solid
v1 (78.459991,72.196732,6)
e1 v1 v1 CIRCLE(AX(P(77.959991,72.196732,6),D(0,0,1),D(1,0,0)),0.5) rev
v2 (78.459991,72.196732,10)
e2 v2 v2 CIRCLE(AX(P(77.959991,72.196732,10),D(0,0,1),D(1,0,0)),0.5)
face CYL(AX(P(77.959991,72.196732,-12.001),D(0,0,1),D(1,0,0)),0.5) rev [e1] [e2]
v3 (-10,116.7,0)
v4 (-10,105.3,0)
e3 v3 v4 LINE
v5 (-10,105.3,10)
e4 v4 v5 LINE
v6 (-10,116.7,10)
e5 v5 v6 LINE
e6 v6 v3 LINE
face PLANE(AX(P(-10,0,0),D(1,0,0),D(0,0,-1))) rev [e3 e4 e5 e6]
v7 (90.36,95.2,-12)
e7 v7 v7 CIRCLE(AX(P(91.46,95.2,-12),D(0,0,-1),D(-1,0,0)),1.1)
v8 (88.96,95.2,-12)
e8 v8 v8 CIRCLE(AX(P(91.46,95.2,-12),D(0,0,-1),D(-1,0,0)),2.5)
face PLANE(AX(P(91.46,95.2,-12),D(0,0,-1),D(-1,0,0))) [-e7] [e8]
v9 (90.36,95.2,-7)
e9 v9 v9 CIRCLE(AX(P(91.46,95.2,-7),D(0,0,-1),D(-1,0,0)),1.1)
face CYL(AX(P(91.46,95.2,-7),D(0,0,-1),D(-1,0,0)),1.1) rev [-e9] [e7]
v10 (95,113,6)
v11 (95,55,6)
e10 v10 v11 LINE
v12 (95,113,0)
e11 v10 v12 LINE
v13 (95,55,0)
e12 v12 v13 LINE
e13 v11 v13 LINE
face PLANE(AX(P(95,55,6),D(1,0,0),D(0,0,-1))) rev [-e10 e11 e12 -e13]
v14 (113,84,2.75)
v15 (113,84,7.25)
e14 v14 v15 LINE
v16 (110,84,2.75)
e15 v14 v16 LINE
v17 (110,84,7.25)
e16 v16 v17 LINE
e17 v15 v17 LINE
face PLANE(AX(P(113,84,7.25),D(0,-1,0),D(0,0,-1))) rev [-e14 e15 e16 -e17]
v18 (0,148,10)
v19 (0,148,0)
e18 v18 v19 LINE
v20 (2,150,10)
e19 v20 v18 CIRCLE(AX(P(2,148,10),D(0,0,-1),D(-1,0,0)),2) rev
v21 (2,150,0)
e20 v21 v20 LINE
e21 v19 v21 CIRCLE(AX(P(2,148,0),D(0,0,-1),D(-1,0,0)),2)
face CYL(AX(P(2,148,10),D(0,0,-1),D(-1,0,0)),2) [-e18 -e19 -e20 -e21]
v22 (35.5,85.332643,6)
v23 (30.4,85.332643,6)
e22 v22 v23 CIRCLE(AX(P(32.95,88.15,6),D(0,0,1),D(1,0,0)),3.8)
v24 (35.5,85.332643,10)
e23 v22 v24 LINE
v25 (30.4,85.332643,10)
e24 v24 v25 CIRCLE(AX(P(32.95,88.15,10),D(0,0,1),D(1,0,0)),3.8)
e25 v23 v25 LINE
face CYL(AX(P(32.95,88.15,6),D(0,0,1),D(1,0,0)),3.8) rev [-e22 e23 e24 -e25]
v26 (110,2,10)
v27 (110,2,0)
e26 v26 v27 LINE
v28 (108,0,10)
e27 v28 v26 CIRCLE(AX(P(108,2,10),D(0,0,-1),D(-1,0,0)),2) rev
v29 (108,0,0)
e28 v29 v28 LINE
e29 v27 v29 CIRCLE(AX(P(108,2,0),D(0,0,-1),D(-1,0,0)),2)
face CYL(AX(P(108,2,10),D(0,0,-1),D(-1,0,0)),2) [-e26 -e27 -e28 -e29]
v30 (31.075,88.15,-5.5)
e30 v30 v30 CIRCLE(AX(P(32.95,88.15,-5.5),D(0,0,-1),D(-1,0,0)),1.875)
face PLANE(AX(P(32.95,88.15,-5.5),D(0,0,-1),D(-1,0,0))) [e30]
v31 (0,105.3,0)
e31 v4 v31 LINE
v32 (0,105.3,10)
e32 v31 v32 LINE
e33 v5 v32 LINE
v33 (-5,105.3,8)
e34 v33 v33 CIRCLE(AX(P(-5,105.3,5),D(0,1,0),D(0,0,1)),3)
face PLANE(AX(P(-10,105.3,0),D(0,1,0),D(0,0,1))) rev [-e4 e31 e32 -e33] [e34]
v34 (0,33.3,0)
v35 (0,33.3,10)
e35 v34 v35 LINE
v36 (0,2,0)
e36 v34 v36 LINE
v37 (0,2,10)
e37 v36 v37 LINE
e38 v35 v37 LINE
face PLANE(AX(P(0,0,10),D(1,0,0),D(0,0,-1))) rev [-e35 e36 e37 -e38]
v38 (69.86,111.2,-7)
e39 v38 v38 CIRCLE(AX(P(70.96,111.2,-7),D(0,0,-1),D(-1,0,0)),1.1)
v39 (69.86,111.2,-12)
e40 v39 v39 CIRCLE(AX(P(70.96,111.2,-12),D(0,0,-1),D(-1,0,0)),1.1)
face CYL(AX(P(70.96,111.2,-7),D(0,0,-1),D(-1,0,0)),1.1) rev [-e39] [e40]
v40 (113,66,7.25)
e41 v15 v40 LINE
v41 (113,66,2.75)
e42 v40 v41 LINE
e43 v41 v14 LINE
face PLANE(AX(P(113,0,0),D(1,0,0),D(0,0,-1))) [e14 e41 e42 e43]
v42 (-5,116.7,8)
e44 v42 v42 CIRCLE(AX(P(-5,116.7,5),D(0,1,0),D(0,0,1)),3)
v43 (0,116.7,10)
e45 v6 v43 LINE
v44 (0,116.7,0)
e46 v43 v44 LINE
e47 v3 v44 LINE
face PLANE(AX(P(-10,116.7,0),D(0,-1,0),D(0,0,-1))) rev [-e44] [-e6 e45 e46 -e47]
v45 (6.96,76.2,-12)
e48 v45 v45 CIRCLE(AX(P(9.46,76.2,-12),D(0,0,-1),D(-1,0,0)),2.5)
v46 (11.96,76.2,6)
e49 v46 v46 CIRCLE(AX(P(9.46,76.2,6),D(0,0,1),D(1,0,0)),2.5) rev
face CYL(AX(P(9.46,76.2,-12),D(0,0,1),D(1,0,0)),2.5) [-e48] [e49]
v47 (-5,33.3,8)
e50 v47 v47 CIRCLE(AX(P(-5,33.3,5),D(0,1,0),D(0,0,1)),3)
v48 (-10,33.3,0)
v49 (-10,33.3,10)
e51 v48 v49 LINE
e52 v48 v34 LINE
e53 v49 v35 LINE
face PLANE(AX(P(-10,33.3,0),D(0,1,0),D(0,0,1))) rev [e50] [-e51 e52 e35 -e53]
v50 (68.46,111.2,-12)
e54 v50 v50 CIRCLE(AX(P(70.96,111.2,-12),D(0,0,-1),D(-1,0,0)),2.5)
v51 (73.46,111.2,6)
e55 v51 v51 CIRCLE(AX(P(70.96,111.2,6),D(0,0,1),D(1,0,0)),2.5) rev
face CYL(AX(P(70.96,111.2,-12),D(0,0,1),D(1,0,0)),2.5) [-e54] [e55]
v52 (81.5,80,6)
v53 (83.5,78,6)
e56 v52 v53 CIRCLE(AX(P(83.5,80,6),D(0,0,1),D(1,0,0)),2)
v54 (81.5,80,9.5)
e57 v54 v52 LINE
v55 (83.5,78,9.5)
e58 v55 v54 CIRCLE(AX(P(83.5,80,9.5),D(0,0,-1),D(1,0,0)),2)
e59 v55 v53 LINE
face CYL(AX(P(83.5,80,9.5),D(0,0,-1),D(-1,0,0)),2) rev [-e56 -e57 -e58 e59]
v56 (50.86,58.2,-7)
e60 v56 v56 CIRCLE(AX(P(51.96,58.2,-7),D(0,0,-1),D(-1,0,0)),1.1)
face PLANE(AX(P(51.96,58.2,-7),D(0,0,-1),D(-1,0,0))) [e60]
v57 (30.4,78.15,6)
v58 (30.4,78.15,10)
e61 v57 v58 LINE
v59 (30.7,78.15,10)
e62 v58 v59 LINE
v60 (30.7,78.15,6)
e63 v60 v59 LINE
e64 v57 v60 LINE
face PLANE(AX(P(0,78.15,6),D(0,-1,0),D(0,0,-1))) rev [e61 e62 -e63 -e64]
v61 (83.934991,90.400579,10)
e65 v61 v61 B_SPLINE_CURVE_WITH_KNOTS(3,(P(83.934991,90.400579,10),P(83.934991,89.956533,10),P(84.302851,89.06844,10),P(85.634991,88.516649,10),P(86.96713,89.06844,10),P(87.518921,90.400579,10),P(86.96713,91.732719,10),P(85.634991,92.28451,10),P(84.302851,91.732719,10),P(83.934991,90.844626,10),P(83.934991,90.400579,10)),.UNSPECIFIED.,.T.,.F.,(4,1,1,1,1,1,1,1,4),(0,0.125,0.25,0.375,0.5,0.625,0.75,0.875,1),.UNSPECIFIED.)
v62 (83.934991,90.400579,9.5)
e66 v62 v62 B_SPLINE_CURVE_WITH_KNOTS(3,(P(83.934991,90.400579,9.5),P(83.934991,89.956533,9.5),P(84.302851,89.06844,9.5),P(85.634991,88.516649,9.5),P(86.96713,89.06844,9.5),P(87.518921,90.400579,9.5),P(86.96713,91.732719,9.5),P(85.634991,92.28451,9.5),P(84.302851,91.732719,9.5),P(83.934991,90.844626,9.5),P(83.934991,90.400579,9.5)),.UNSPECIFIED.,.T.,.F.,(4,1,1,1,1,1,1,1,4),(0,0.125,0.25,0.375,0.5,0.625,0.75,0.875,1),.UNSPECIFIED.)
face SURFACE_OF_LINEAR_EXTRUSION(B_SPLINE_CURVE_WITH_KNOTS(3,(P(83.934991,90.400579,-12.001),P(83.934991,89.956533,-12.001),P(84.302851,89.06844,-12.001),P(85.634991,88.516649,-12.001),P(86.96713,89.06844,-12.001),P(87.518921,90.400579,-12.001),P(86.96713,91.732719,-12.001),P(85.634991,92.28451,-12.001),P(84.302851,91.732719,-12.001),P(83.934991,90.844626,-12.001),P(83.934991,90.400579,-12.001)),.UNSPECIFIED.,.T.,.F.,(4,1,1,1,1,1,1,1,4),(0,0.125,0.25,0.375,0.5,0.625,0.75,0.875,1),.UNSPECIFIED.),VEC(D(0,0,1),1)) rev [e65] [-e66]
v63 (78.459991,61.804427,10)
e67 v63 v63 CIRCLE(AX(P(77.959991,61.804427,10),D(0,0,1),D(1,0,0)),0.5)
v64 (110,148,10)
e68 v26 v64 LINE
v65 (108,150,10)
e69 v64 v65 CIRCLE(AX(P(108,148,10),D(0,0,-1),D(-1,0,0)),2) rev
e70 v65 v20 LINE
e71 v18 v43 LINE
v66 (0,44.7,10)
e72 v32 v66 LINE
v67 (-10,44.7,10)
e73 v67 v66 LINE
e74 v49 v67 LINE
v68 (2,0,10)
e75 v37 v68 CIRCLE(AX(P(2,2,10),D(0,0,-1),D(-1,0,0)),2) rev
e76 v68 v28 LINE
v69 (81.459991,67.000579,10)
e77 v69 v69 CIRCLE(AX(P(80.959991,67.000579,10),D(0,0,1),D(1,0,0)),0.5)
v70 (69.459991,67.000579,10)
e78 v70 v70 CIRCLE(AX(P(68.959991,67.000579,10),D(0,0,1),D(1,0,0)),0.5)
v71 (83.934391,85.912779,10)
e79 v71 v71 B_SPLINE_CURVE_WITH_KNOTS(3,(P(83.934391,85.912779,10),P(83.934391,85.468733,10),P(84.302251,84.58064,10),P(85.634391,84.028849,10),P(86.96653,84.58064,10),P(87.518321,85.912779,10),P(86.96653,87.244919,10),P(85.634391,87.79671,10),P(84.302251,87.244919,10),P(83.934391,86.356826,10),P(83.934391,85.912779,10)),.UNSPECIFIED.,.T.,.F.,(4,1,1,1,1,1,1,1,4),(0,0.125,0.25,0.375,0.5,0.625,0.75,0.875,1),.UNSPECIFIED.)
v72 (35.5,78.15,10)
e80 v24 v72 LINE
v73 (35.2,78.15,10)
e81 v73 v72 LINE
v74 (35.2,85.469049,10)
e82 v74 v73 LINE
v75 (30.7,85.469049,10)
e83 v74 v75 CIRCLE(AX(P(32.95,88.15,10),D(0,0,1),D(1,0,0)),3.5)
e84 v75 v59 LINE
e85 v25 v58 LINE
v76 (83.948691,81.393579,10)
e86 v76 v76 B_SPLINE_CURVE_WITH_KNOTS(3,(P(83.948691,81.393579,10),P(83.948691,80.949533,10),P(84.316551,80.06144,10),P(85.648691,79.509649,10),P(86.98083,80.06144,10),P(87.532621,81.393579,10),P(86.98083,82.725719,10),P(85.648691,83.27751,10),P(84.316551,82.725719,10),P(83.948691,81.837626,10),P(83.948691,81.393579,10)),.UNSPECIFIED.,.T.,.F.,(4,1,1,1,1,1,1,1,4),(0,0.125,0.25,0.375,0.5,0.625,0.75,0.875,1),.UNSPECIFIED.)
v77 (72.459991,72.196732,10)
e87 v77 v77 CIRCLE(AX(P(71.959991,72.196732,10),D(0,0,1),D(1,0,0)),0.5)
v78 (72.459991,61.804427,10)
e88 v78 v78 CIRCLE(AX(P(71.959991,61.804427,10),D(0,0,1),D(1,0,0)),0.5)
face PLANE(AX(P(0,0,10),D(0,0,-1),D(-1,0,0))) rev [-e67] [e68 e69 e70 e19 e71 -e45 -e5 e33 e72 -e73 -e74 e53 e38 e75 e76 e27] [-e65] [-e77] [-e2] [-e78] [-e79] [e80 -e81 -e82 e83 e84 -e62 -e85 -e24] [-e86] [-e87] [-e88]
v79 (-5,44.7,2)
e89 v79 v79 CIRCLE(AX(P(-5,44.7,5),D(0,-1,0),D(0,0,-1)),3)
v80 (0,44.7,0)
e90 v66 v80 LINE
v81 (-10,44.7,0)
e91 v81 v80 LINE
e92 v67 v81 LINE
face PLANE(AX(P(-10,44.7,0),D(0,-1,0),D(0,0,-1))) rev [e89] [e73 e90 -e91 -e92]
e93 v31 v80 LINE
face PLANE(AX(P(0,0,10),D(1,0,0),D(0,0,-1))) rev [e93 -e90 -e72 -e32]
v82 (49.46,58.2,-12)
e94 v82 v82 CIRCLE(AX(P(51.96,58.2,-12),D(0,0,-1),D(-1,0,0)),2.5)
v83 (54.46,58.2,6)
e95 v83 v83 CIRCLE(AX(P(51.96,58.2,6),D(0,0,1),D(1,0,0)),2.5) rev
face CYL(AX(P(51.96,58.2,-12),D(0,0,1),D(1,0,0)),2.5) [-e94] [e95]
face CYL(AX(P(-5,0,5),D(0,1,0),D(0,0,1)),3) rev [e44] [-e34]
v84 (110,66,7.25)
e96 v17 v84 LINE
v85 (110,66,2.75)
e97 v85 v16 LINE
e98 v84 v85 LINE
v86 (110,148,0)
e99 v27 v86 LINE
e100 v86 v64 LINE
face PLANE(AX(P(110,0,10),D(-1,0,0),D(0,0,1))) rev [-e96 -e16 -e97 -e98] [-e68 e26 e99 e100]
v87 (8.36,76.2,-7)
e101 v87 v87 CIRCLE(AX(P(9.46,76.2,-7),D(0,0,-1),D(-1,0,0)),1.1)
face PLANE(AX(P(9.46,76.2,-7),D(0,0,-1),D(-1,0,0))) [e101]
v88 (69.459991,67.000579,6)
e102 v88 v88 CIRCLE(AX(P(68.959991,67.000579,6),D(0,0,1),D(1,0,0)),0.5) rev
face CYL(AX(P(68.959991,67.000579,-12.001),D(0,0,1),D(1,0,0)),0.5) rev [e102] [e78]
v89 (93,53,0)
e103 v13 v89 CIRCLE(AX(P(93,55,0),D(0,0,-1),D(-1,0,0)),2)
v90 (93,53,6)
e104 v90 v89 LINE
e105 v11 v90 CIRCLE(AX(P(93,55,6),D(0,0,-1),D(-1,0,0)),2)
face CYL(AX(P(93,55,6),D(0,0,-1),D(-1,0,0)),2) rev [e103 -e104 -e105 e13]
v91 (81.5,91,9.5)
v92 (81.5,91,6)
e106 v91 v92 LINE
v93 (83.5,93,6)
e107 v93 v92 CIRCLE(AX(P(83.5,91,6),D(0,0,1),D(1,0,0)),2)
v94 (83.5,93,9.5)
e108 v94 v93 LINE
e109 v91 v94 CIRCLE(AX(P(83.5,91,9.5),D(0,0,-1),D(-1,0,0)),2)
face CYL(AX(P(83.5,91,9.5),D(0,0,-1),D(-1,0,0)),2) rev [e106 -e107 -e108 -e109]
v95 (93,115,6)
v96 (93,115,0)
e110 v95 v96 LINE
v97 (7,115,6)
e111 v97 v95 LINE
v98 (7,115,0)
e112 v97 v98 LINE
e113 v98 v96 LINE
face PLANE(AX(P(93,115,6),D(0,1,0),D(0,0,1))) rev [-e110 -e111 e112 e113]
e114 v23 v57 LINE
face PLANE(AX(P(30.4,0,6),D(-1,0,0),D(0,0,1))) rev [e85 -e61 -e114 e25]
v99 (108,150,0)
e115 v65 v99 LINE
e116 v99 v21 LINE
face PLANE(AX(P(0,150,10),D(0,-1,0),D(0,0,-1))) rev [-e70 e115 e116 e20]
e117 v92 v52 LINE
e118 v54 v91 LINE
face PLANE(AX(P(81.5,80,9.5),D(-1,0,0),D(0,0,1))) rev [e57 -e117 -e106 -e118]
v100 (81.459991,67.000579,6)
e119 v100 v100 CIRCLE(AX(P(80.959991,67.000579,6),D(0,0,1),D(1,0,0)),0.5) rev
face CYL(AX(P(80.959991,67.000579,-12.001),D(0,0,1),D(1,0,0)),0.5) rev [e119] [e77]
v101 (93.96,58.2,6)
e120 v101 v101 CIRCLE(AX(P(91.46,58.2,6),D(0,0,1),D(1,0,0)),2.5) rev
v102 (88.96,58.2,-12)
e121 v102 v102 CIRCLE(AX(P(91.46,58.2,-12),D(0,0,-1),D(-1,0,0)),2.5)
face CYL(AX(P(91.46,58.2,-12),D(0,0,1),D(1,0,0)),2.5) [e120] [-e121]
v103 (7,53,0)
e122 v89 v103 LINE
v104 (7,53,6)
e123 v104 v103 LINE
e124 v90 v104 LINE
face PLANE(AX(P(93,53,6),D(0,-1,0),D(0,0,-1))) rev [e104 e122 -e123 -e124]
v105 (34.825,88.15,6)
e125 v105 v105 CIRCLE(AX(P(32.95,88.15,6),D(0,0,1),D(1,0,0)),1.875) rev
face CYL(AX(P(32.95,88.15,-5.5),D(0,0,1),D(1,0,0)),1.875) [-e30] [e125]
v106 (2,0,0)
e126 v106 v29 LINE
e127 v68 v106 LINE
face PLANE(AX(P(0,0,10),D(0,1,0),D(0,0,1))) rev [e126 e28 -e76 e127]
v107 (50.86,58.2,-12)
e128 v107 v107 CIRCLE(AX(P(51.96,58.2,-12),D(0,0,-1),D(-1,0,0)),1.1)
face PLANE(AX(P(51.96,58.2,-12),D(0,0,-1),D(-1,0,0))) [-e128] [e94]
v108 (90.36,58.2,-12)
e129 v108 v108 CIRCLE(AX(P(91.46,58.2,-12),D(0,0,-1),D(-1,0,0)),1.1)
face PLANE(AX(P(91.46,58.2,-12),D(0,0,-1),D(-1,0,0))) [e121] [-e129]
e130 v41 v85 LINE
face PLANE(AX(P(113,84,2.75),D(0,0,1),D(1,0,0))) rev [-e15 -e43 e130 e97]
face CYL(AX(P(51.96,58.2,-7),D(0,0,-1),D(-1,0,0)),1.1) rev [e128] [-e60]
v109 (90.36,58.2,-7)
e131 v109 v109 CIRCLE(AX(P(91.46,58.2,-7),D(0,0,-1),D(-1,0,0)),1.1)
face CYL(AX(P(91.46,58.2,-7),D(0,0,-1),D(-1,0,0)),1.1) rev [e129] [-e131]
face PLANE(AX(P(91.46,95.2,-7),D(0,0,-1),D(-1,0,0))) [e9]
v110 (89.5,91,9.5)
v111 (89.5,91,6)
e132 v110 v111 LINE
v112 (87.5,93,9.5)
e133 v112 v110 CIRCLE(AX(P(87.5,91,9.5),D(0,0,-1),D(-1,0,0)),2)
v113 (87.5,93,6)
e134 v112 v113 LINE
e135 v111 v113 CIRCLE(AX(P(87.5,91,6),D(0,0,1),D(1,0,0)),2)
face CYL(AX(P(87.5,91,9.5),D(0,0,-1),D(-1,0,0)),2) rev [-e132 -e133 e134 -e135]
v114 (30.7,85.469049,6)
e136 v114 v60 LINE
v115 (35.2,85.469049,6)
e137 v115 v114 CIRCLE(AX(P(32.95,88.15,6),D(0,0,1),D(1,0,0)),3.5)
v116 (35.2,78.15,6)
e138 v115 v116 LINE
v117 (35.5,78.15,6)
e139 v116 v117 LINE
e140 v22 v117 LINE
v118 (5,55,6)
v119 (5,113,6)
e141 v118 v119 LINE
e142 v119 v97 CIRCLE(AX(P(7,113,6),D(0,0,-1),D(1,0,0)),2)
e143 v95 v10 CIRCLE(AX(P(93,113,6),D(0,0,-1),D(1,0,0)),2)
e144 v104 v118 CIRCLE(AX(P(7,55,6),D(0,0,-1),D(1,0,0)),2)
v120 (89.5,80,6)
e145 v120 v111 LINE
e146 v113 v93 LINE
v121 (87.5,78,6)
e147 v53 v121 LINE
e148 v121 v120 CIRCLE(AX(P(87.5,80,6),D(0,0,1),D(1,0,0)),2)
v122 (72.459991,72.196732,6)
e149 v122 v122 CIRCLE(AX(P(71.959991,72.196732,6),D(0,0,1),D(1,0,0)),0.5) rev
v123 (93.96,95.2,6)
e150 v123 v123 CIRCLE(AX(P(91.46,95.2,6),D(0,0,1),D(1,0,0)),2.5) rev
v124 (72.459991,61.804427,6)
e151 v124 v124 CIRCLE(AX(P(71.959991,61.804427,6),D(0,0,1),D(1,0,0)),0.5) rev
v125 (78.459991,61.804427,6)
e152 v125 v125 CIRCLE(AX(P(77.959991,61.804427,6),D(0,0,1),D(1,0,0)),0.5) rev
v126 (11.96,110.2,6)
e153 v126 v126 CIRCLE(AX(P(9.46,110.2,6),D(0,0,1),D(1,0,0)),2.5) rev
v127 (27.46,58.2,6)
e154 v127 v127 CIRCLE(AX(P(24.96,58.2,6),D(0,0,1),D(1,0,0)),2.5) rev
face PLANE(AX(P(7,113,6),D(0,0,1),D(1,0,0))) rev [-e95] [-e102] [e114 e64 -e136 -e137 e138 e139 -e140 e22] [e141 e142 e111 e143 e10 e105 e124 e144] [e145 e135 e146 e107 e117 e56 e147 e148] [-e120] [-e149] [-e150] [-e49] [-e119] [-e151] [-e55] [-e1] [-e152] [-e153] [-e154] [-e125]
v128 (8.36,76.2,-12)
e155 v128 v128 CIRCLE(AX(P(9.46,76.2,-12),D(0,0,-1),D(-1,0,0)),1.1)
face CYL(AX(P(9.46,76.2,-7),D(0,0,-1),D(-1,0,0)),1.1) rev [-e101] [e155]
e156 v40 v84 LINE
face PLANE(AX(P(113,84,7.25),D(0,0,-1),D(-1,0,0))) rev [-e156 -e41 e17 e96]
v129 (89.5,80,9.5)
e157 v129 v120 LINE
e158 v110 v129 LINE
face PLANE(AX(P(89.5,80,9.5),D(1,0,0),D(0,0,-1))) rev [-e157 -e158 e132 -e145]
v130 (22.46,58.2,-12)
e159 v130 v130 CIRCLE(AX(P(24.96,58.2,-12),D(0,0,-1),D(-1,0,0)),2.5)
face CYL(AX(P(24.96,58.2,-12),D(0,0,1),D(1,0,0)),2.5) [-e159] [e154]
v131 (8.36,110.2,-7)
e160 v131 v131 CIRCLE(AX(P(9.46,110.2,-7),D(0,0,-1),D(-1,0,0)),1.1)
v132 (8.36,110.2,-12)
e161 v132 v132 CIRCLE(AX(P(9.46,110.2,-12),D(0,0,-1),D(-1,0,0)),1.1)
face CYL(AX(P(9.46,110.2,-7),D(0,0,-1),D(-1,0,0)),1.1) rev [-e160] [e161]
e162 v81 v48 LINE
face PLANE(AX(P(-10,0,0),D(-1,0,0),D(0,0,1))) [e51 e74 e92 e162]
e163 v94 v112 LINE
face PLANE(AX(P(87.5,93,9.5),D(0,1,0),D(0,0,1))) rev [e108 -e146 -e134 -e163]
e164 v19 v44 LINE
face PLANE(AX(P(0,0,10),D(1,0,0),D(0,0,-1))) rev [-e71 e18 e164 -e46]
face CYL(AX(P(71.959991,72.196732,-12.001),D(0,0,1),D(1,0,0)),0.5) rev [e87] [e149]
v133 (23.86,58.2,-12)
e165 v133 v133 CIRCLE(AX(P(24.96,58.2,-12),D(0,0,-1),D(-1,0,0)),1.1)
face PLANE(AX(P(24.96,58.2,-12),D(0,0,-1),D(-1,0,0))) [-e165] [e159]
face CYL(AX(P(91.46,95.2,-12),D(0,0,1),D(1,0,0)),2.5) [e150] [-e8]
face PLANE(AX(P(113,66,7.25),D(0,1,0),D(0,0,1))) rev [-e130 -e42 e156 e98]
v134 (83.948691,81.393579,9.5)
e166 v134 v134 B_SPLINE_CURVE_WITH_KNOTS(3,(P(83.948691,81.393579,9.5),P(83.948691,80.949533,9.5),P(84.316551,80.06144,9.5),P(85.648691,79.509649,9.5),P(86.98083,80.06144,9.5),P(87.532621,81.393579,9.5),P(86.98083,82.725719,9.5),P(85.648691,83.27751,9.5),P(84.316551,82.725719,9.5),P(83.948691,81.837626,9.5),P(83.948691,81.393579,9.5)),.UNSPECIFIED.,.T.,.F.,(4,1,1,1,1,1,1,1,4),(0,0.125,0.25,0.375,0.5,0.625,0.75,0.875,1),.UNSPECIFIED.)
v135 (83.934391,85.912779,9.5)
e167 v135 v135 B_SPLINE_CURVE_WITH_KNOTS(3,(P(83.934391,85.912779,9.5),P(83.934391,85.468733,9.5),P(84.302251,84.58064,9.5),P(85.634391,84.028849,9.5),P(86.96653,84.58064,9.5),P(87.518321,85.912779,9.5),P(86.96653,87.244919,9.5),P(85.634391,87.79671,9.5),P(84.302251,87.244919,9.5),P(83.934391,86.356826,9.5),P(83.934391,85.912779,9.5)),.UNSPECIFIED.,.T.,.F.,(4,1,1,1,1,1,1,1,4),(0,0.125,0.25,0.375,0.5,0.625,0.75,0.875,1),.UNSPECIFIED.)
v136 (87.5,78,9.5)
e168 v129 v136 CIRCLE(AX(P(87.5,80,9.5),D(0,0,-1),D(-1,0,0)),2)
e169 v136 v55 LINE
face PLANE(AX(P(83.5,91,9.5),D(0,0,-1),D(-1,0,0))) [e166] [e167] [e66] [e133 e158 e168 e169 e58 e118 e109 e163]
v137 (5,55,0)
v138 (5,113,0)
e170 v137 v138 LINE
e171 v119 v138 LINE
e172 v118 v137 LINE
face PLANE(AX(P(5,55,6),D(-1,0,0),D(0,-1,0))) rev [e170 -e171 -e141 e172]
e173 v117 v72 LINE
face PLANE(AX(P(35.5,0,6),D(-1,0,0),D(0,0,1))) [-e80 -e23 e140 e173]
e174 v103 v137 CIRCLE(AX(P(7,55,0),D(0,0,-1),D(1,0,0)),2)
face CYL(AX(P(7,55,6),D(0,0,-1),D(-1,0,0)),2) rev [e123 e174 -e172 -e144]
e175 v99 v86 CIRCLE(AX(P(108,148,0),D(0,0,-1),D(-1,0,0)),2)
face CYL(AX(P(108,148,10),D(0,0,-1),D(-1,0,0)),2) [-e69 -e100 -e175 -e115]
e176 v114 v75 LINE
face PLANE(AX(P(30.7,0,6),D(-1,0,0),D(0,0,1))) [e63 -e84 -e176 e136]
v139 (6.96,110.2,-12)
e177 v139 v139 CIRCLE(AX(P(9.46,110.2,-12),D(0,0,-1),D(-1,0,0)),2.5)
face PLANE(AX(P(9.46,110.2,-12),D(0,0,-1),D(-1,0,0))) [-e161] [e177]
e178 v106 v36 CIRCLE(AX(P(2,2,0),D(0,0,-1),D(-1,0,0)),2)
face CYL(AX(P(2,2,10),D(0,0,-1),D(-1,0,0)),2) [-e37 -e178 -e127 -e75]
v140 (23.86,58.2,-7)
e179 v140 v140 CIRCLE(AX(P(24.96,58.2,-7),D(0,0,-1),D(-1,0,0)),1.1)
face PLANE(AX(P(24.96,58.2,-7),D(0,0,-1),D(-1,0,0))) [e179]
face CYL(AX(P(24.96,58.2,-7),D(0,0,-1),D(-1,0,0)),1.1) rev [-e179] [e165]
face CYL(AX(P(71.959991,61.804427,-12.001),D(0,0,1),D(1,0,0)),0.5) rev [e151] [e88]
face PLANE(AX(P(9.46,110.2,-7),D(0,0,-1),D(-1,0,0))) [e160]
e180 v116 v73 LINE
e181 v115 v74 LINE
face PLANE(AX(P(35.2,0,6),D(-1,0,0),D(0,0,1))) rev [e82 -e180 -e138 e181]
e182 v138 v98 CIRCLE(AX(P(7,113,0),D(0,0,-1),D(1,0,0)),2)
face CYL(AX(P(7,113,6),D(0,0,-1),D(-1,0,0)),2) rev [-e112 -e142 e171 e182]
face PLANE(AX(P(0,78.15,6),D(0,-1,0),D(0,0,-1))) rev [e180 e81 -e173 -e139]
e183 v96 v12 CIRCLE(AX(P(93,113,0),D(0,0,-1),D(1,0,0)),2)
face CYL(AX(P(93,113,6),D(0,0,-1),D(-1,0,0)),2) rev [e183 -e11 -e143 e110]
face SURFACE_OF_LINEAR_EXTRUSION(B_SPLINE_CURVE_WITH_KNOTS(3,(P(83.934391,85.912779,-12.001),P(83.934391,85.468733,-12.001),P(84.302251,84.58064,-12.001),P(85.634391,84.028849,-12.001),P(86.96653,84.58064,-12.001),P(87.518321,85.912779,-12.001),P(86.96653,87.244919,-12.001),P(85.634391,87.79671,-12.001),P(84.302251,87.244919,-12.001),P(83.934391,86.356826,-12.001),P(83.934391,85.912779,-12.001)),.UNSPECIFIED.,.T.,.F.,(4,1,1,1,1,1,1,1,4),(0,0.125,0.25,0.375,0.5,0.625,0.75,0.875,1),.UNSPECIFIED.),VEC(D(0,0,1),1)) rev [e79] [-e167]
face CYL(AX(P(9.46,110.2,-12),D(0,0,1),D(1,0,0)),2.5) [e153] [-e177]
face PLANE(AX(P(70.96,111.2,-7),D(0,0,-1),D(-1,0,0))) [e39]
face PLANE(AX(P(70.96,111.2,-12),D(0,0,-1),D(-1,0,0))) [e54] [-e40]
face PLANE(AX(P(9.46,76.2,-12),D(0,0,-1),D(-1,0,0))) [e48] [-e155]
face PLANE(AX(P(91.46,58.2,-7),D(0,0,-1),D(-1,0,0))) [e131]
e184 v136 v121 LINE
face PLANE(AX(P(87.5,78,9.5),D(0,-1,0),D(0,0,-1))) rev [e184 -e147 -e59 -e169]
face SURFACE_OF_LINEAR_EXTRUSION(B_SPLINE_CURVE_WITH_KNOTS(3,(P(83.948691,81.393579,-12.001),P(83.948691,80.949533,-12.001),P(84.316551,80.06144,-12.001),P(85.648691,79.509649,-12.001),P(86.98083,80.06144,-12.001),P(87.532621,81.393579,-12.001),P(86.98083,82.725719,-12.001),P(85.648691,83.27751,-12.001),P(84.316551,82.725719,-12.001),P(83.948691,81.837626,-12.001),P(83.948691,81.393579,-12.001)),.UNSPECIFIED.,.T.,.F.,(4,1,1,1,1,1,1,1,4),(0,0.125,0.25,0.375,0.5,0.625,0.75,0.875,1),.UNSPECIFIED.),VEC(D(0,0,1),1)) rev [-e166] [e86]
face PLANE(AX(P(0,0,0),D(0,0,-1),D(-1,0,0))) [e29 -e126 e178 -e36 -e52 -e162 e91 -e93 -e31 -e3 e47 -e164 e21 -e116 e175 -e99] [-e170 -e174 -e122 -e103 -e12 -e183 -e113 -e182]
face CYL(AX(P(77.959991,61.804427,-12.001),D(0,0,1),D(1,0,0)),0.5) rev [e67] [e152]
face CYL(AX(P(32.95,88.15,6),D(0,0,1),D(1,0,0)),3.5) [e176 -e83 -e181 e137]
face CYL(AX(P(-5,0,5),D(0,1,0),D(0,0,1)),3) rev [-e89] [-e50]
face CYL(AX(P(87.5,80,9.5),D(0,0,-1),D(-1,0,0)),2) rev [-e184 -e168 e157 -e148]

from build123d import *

# Parameters (mm, degrees)
SKETCH1_W              = 110
SKETCH1_H              = 150
BOSS_EXTRUDE1_DEPTH    = 10
CUT_EXTRUDE1_DEPTH     = 6
SKETCH3_R              = 2.5
BOSS_EXTRUDE2_DEPTH    = 18
CUT_EXTRUDE2_START     = -12
SKETCH5_R              = 1.1
CUT_EXTRUDE2_DEPTH     = 5
CUT_EXTRUDE3_START     = 0.5
CUT_EXTRUDE3_DEPTH     = 4
SKETCH7_R              = 1.875
BOSS_EXTRUDE3_DEPTH    = 11.5
CUT_EXTRUDE4_DEPTH     = 4
SKETCH9_W              = 10
SKETCH9_H              = 11.4
BOSS_EXTRUDE4_DEPTH    = 10
SKETCH10_R             = 3
CUT_EXTRUDE5_DEPTH     = 161.819432905
SKETCH11_W             = 4.5
SKETCH11_H             = 18
BOSS_EXTRUDE5_DEPTH    = 3
FILLET1_R              = 2
CUT_EXTRUDE6_START     = -4
CUT_EXTRUDE6_OUTLINE_R = 0.5
CUT_EXTRUDE6_DEPTH     = 4


# Read off the part's stored shape, not the designer's step: Cut-Extrude6
with BuildPart() as part:
    # Sketch1 → Boss-Extrude1 (new body)
    with BuildSketch(Plane.XY):
        with Locations((55, 75)):
            Rectangle(SKETCH1_W, SKETCH1_H)
    extrude(amount=BOSS_EXTRUDE1_DEPTH)

    # Sketch2 → Cut-Extrude1 (cut)
    with BuildSketch(Plane(origin=(0, 0, 0), x_dir=(-1, 0, 0), z_dir=(0, 0, -1))):
        with BuildLine():
            Line((-93, 53), (-7, 53))
            ThreePointArc((-7, 53), (-5.585786438, 53.585786438), (-5, 55))
            Line((-5, 55), (-5, 113))
            ThreePointArc((-5, 113), (-5.585786438, 114.414213562), (-7, 115))
            Line((-7, 115), (-93, 115))
            ThreePointArc((-93, 115), (-94.414213562, 114.414213562), (-95, 113))
            Line((-95, 113), (-95, 55))
            ThreePointArc((-95, 55), (-94.414213562, 53.585786438), (-93, 53))
        make_face()
    extrude(amount=-CUT_EXTRUDE1_DEPTH, mode=Mode.SUBTRACT)

    # Sketch3 → Boss-Extrude2 (add)
    with BuildSketch(Plane(origin=(0, 0, 6), x_dir=(-1, 0, 0), z_dir=(0, 0, -1))):
        with Locations(Location((-91.46, 95.2, 0), (0, 0, 180))):
            Circle(SKETCH3_R)
        with Locations(Location((-70.96, 111.2, 0), (0, 0, 180))):
            Circle(SKETCH3_R)
        with Locations(Location((-9.46, 110.2, 0), (0, 0, 180))):
            Circle(SKETCH3_R)
        with Locations(Location((-9.46, 76.2, 0), (0, 0, 180))):
            Circle(SKETCH3_R)
        with Locations(Location((-24.96, 58.2, 0), (0, 0, 180))):
            Circle(SKETCH3_R)
        with Locations(Location((-51.96, 58.2, 0), (0, 0, 180))):
            Circle(SKETCH3_R)
        with Locations(Location((-91.46, 58.2, 0), (0, 0, 180))):
            Circle(SKETCH3_R)
    extrude(amount=BOSS_EXTRUDE2_DEPTH)

    # Sketch5 → Cut-Extrude2 (cut)
    with BuildSketch(Plane.XY.offset(CUT_EXTRUDE2_START)):
        with Locations(Location((91.46, 58.2, 0), (0, 0, 180))):
            Circle(SKETCH5_R)
        with Locations(Location((51.96, 58.2, 0), (0, 0, 180))):
            Circle(SKETCH5_R)
        with Locations(Location((24.96, 58.2, 0), (0, 0, 180))):
            Circle(SKETCH5_R)
        with Locations(Location((9.46, 76.2, 0), (0, 0, 180))):
            Circle(SKETCH5_R)
        with Locations(Location((9.46, 110.2, 0), (0, 0, 180))):
            Circle(SKETCH5_R)
        with Locations(Location((70.96, 111.2, 0), (0, 0, 180))):
            Circle(SKETCH5_R)
        with Locations(Location((91.46, 95.2, 0), (0, 0, 180))):
            Circle(SKETCH5_R)
    extrude(amount=CUT_EXTRUDE2_DEPTH, mode=Mode.SUBTRACT)

    # Sketch6 → Cut-Extrude3 (cut)
    with BuildSketch(Plane(origin=(0, 0, 6), x_dir=(-1, 0, 0), z_dir=(0, 0, -1)).offset(CUT_EXTRUDE3_START)):
        with BuildLine():
            Line((-87.5, 78), (-83.5, 78))
            ThreePointArc((-83.5, 78), (-82.085786438, 78.585786438), (-81.5, 80))
            Line((-81.5, 80), (-81.5, 91))
            ThreePointArc((-81.5, 91), (-82.085786438, 92.414213562), (-83.5, 93))
            Line((-83.5, 93), (-87.5, 93))
            ThreePointArc((-87.5, 93), (-88.914213562, 92.414213562), (-89.5, 91))
            Line((-89.5, 91), (-89.5, 80))
            ThreePointArc((-89.5, 80), (-88.914213562, 78.585786438), (-87.5, 78))
        make_face()
    extrude(amount=-CUT_EXTRUDE3_DEPTH, mode=Mode.SUBTRACT)

    # Sketch7 → Boss-Extrude3 (add)
    with BuildSketch(Plane(origin=(0, 0, 6), x_dir=(-1, 0, 0), z_dir=(0, 0, -1))):
        with Locations(Location((-32.95, 88.15, 0), (0, 0, 180))):
            Circle(SKETCH7_R)
    extrude(amount=BOSS_EXTRUDE3_DEPTH)

    # Sketch8 → Cut-Extrude4 (cut)
    with BuildSketch(Plane.XY.offset(10)):
        with BuildLine():
            Line((30.7, 78.15), (30.7, 85.469048676))
            ThreePointArc((30.7, 85.469048676), (32.95, 91.65), (35.2, 85.469048676))
            Line((35.2, 85.469048676), (35.2, 78.15))
            Line((35.2, 78.15), (35.5, 78.15))
            Line((35.5, 78.15), (35.5, 85.332643083))
            ThreePointArc((35.5, 85.332643083), (32.95, 91.95), (30.4, 85.332643083))
            Line((30.4, 85.332643083), (30.4, 78.15))
            Line((30.4, 78.15), (30.7, 78.15))
        make_face()
    extrude(amount=-CUT_EXTRUDE4_DEPTH, mode=Mode.SUBTRACT)

    # Sketch9 → Boss-Extrude4 (add)
    with BuildSketch(Plane.ZY):
        with Locations((5, 39)):
            Rectangle(SKETCH9_W, SKETCH9_H)
        with Locations((5, 111)):
            Rectangle(SKETCH9_W, SKETCH9_H)
    extrude(amount=BOSS_EXTRUDE4_DEPTH)

    # Sketch10 → Cut-Extrude5 (cut, through all)
    with BuildSketch(Plane(origin=(0, 116.7, 0), x_dir=(1, 0, 0), z_dir=(0, 1, 0))):
        with Locations(Location((-5, -5, 0), (0, 0, 270))):
            Circle(SKETCH10_R)
    extrude(amount=-CUT_EXTRUDE5_DEPTH, mode=Mode.SUBTRACT)

    # Sketch11 → Boss-Extrude5 (add)
    with BuildSketch(Plane(origin=(110, 0, 0), x_dir=(0, 0, -1), z_dir=(1, 0, 0))):
        with Locations((-5, 75)):
            Rectangle(SKETCH11_W, SKETCH11_H)
    extrude(amount=BOSS_EXTRUDE5_DEPTH)

    # Fillet1
    fillet1_edges = [part.edges().sort_by_distance(p)[0] for p in [
        (0, 150, 5),
        (110, 150, 5),
        (110, 0, 5),
        (0, 0, 5),
    ]]
    fillet(fillet1_edges, radius=FILLET1_R)

    # Cut-Extrude6 outline → Cut-Extrude6 (cut)
    with BuildSketch(Plane.XY.offset(10).offset(CUT_EXTRUDE6_START)):
        with BuildLine():
            add(Edge.make_bspline(
                [(83.934390614, 85.912779414), (83.934390614, 85.468732827), (84.302250852, 84.580639652), (85.634390614, 84.028849296), (86.966530376, 84.580639652), (87.518320733, 85.912779414), (86.966530376, 87.244919177), (85.634390614, 87.796709533), (84.302250852, 87.244919177), (83.934390614, 86.356826002), (83.934390614, 85.912779414)],
                knots=[0, 0, 0, 0, 0.125, 0.25, 0.375, 0.5, 0.625, 0.75, 0.875, 1, 1, 1, 1], degree=3))
        make_face()
        with BuildLine():
            add(Edge.make_bspline(
                [(83.948690614, 81.393579414), (83.948690614, 80.949532827), (84.316550852, 80.061439652), (85.648690614, 79.509649296), (86.980830376, 80.061439652), (87.532620733, 81.393579414), (86.980830376, 82.725719177), (85.648690614, 83.277509533), (84.316550852, 82.725719177), (83.948690614, 81.837626002), (83.948690614, 81.393579414)],
                knots=[0, 0, 0, 0, 0.125, 0.25, 0.375, 0.5, 0.625, 0.75, 0.875, 1, 1, 1, 1], degree=3))
        make_face()
        with BuildLine():
            add(Edge.make_bspline(
                [(83.934990614, 90.400579414), (83.934990614, 89.956532827), (84.302850852, 89.068439652), (85.634990614, 88.516649296), (86.967130376, 89.068439652), (87.518920733, 90.400579414), (86.967130376, 91.732719177), (85.634990614, 92.284509533), (84.302850852, 91.732719177), (83.934990614, 90.844626002), (83.934990614, 90.400579414)],
                knots=[0, 0, 0, 0, 0.125, 0.25, 0.375, 0.5, 0.625, 0.75, 0.875, 1, 1, 1, 1], degree=3))
        make_face()
        with Locations((68.959990614, 67.000579414)):
            Circle(CUT_EXTRUDE6_OUTLINE_R)
        with Locations((71.959990614, 72.196731837)):
            Circle(CUT_EXTRUDE6_OUTLINE_R)
        with Locations((77.959990614, 72.196731837)):
            Circle(CUT_EXTRUDE6_OUTLINE_R)
        with Locations((80.959990614, 67.000579414)):
            Circle(CUT_EXTRUDE6_OUTLINE_R)
        with Locations((77.959990614, 61.804426992)):
            Circle(CUT_EXTRUDE6_OUTLINE_R)
        with Locations((71.959990614, 61.804426992)):
            Circle(CUT_EXTRUDE6_OUTLINE_R)
    extrude(amount=CUT_EXTRUDE6_DEPTH, mode=Mode.SUBTRACT)


solid = part.part
